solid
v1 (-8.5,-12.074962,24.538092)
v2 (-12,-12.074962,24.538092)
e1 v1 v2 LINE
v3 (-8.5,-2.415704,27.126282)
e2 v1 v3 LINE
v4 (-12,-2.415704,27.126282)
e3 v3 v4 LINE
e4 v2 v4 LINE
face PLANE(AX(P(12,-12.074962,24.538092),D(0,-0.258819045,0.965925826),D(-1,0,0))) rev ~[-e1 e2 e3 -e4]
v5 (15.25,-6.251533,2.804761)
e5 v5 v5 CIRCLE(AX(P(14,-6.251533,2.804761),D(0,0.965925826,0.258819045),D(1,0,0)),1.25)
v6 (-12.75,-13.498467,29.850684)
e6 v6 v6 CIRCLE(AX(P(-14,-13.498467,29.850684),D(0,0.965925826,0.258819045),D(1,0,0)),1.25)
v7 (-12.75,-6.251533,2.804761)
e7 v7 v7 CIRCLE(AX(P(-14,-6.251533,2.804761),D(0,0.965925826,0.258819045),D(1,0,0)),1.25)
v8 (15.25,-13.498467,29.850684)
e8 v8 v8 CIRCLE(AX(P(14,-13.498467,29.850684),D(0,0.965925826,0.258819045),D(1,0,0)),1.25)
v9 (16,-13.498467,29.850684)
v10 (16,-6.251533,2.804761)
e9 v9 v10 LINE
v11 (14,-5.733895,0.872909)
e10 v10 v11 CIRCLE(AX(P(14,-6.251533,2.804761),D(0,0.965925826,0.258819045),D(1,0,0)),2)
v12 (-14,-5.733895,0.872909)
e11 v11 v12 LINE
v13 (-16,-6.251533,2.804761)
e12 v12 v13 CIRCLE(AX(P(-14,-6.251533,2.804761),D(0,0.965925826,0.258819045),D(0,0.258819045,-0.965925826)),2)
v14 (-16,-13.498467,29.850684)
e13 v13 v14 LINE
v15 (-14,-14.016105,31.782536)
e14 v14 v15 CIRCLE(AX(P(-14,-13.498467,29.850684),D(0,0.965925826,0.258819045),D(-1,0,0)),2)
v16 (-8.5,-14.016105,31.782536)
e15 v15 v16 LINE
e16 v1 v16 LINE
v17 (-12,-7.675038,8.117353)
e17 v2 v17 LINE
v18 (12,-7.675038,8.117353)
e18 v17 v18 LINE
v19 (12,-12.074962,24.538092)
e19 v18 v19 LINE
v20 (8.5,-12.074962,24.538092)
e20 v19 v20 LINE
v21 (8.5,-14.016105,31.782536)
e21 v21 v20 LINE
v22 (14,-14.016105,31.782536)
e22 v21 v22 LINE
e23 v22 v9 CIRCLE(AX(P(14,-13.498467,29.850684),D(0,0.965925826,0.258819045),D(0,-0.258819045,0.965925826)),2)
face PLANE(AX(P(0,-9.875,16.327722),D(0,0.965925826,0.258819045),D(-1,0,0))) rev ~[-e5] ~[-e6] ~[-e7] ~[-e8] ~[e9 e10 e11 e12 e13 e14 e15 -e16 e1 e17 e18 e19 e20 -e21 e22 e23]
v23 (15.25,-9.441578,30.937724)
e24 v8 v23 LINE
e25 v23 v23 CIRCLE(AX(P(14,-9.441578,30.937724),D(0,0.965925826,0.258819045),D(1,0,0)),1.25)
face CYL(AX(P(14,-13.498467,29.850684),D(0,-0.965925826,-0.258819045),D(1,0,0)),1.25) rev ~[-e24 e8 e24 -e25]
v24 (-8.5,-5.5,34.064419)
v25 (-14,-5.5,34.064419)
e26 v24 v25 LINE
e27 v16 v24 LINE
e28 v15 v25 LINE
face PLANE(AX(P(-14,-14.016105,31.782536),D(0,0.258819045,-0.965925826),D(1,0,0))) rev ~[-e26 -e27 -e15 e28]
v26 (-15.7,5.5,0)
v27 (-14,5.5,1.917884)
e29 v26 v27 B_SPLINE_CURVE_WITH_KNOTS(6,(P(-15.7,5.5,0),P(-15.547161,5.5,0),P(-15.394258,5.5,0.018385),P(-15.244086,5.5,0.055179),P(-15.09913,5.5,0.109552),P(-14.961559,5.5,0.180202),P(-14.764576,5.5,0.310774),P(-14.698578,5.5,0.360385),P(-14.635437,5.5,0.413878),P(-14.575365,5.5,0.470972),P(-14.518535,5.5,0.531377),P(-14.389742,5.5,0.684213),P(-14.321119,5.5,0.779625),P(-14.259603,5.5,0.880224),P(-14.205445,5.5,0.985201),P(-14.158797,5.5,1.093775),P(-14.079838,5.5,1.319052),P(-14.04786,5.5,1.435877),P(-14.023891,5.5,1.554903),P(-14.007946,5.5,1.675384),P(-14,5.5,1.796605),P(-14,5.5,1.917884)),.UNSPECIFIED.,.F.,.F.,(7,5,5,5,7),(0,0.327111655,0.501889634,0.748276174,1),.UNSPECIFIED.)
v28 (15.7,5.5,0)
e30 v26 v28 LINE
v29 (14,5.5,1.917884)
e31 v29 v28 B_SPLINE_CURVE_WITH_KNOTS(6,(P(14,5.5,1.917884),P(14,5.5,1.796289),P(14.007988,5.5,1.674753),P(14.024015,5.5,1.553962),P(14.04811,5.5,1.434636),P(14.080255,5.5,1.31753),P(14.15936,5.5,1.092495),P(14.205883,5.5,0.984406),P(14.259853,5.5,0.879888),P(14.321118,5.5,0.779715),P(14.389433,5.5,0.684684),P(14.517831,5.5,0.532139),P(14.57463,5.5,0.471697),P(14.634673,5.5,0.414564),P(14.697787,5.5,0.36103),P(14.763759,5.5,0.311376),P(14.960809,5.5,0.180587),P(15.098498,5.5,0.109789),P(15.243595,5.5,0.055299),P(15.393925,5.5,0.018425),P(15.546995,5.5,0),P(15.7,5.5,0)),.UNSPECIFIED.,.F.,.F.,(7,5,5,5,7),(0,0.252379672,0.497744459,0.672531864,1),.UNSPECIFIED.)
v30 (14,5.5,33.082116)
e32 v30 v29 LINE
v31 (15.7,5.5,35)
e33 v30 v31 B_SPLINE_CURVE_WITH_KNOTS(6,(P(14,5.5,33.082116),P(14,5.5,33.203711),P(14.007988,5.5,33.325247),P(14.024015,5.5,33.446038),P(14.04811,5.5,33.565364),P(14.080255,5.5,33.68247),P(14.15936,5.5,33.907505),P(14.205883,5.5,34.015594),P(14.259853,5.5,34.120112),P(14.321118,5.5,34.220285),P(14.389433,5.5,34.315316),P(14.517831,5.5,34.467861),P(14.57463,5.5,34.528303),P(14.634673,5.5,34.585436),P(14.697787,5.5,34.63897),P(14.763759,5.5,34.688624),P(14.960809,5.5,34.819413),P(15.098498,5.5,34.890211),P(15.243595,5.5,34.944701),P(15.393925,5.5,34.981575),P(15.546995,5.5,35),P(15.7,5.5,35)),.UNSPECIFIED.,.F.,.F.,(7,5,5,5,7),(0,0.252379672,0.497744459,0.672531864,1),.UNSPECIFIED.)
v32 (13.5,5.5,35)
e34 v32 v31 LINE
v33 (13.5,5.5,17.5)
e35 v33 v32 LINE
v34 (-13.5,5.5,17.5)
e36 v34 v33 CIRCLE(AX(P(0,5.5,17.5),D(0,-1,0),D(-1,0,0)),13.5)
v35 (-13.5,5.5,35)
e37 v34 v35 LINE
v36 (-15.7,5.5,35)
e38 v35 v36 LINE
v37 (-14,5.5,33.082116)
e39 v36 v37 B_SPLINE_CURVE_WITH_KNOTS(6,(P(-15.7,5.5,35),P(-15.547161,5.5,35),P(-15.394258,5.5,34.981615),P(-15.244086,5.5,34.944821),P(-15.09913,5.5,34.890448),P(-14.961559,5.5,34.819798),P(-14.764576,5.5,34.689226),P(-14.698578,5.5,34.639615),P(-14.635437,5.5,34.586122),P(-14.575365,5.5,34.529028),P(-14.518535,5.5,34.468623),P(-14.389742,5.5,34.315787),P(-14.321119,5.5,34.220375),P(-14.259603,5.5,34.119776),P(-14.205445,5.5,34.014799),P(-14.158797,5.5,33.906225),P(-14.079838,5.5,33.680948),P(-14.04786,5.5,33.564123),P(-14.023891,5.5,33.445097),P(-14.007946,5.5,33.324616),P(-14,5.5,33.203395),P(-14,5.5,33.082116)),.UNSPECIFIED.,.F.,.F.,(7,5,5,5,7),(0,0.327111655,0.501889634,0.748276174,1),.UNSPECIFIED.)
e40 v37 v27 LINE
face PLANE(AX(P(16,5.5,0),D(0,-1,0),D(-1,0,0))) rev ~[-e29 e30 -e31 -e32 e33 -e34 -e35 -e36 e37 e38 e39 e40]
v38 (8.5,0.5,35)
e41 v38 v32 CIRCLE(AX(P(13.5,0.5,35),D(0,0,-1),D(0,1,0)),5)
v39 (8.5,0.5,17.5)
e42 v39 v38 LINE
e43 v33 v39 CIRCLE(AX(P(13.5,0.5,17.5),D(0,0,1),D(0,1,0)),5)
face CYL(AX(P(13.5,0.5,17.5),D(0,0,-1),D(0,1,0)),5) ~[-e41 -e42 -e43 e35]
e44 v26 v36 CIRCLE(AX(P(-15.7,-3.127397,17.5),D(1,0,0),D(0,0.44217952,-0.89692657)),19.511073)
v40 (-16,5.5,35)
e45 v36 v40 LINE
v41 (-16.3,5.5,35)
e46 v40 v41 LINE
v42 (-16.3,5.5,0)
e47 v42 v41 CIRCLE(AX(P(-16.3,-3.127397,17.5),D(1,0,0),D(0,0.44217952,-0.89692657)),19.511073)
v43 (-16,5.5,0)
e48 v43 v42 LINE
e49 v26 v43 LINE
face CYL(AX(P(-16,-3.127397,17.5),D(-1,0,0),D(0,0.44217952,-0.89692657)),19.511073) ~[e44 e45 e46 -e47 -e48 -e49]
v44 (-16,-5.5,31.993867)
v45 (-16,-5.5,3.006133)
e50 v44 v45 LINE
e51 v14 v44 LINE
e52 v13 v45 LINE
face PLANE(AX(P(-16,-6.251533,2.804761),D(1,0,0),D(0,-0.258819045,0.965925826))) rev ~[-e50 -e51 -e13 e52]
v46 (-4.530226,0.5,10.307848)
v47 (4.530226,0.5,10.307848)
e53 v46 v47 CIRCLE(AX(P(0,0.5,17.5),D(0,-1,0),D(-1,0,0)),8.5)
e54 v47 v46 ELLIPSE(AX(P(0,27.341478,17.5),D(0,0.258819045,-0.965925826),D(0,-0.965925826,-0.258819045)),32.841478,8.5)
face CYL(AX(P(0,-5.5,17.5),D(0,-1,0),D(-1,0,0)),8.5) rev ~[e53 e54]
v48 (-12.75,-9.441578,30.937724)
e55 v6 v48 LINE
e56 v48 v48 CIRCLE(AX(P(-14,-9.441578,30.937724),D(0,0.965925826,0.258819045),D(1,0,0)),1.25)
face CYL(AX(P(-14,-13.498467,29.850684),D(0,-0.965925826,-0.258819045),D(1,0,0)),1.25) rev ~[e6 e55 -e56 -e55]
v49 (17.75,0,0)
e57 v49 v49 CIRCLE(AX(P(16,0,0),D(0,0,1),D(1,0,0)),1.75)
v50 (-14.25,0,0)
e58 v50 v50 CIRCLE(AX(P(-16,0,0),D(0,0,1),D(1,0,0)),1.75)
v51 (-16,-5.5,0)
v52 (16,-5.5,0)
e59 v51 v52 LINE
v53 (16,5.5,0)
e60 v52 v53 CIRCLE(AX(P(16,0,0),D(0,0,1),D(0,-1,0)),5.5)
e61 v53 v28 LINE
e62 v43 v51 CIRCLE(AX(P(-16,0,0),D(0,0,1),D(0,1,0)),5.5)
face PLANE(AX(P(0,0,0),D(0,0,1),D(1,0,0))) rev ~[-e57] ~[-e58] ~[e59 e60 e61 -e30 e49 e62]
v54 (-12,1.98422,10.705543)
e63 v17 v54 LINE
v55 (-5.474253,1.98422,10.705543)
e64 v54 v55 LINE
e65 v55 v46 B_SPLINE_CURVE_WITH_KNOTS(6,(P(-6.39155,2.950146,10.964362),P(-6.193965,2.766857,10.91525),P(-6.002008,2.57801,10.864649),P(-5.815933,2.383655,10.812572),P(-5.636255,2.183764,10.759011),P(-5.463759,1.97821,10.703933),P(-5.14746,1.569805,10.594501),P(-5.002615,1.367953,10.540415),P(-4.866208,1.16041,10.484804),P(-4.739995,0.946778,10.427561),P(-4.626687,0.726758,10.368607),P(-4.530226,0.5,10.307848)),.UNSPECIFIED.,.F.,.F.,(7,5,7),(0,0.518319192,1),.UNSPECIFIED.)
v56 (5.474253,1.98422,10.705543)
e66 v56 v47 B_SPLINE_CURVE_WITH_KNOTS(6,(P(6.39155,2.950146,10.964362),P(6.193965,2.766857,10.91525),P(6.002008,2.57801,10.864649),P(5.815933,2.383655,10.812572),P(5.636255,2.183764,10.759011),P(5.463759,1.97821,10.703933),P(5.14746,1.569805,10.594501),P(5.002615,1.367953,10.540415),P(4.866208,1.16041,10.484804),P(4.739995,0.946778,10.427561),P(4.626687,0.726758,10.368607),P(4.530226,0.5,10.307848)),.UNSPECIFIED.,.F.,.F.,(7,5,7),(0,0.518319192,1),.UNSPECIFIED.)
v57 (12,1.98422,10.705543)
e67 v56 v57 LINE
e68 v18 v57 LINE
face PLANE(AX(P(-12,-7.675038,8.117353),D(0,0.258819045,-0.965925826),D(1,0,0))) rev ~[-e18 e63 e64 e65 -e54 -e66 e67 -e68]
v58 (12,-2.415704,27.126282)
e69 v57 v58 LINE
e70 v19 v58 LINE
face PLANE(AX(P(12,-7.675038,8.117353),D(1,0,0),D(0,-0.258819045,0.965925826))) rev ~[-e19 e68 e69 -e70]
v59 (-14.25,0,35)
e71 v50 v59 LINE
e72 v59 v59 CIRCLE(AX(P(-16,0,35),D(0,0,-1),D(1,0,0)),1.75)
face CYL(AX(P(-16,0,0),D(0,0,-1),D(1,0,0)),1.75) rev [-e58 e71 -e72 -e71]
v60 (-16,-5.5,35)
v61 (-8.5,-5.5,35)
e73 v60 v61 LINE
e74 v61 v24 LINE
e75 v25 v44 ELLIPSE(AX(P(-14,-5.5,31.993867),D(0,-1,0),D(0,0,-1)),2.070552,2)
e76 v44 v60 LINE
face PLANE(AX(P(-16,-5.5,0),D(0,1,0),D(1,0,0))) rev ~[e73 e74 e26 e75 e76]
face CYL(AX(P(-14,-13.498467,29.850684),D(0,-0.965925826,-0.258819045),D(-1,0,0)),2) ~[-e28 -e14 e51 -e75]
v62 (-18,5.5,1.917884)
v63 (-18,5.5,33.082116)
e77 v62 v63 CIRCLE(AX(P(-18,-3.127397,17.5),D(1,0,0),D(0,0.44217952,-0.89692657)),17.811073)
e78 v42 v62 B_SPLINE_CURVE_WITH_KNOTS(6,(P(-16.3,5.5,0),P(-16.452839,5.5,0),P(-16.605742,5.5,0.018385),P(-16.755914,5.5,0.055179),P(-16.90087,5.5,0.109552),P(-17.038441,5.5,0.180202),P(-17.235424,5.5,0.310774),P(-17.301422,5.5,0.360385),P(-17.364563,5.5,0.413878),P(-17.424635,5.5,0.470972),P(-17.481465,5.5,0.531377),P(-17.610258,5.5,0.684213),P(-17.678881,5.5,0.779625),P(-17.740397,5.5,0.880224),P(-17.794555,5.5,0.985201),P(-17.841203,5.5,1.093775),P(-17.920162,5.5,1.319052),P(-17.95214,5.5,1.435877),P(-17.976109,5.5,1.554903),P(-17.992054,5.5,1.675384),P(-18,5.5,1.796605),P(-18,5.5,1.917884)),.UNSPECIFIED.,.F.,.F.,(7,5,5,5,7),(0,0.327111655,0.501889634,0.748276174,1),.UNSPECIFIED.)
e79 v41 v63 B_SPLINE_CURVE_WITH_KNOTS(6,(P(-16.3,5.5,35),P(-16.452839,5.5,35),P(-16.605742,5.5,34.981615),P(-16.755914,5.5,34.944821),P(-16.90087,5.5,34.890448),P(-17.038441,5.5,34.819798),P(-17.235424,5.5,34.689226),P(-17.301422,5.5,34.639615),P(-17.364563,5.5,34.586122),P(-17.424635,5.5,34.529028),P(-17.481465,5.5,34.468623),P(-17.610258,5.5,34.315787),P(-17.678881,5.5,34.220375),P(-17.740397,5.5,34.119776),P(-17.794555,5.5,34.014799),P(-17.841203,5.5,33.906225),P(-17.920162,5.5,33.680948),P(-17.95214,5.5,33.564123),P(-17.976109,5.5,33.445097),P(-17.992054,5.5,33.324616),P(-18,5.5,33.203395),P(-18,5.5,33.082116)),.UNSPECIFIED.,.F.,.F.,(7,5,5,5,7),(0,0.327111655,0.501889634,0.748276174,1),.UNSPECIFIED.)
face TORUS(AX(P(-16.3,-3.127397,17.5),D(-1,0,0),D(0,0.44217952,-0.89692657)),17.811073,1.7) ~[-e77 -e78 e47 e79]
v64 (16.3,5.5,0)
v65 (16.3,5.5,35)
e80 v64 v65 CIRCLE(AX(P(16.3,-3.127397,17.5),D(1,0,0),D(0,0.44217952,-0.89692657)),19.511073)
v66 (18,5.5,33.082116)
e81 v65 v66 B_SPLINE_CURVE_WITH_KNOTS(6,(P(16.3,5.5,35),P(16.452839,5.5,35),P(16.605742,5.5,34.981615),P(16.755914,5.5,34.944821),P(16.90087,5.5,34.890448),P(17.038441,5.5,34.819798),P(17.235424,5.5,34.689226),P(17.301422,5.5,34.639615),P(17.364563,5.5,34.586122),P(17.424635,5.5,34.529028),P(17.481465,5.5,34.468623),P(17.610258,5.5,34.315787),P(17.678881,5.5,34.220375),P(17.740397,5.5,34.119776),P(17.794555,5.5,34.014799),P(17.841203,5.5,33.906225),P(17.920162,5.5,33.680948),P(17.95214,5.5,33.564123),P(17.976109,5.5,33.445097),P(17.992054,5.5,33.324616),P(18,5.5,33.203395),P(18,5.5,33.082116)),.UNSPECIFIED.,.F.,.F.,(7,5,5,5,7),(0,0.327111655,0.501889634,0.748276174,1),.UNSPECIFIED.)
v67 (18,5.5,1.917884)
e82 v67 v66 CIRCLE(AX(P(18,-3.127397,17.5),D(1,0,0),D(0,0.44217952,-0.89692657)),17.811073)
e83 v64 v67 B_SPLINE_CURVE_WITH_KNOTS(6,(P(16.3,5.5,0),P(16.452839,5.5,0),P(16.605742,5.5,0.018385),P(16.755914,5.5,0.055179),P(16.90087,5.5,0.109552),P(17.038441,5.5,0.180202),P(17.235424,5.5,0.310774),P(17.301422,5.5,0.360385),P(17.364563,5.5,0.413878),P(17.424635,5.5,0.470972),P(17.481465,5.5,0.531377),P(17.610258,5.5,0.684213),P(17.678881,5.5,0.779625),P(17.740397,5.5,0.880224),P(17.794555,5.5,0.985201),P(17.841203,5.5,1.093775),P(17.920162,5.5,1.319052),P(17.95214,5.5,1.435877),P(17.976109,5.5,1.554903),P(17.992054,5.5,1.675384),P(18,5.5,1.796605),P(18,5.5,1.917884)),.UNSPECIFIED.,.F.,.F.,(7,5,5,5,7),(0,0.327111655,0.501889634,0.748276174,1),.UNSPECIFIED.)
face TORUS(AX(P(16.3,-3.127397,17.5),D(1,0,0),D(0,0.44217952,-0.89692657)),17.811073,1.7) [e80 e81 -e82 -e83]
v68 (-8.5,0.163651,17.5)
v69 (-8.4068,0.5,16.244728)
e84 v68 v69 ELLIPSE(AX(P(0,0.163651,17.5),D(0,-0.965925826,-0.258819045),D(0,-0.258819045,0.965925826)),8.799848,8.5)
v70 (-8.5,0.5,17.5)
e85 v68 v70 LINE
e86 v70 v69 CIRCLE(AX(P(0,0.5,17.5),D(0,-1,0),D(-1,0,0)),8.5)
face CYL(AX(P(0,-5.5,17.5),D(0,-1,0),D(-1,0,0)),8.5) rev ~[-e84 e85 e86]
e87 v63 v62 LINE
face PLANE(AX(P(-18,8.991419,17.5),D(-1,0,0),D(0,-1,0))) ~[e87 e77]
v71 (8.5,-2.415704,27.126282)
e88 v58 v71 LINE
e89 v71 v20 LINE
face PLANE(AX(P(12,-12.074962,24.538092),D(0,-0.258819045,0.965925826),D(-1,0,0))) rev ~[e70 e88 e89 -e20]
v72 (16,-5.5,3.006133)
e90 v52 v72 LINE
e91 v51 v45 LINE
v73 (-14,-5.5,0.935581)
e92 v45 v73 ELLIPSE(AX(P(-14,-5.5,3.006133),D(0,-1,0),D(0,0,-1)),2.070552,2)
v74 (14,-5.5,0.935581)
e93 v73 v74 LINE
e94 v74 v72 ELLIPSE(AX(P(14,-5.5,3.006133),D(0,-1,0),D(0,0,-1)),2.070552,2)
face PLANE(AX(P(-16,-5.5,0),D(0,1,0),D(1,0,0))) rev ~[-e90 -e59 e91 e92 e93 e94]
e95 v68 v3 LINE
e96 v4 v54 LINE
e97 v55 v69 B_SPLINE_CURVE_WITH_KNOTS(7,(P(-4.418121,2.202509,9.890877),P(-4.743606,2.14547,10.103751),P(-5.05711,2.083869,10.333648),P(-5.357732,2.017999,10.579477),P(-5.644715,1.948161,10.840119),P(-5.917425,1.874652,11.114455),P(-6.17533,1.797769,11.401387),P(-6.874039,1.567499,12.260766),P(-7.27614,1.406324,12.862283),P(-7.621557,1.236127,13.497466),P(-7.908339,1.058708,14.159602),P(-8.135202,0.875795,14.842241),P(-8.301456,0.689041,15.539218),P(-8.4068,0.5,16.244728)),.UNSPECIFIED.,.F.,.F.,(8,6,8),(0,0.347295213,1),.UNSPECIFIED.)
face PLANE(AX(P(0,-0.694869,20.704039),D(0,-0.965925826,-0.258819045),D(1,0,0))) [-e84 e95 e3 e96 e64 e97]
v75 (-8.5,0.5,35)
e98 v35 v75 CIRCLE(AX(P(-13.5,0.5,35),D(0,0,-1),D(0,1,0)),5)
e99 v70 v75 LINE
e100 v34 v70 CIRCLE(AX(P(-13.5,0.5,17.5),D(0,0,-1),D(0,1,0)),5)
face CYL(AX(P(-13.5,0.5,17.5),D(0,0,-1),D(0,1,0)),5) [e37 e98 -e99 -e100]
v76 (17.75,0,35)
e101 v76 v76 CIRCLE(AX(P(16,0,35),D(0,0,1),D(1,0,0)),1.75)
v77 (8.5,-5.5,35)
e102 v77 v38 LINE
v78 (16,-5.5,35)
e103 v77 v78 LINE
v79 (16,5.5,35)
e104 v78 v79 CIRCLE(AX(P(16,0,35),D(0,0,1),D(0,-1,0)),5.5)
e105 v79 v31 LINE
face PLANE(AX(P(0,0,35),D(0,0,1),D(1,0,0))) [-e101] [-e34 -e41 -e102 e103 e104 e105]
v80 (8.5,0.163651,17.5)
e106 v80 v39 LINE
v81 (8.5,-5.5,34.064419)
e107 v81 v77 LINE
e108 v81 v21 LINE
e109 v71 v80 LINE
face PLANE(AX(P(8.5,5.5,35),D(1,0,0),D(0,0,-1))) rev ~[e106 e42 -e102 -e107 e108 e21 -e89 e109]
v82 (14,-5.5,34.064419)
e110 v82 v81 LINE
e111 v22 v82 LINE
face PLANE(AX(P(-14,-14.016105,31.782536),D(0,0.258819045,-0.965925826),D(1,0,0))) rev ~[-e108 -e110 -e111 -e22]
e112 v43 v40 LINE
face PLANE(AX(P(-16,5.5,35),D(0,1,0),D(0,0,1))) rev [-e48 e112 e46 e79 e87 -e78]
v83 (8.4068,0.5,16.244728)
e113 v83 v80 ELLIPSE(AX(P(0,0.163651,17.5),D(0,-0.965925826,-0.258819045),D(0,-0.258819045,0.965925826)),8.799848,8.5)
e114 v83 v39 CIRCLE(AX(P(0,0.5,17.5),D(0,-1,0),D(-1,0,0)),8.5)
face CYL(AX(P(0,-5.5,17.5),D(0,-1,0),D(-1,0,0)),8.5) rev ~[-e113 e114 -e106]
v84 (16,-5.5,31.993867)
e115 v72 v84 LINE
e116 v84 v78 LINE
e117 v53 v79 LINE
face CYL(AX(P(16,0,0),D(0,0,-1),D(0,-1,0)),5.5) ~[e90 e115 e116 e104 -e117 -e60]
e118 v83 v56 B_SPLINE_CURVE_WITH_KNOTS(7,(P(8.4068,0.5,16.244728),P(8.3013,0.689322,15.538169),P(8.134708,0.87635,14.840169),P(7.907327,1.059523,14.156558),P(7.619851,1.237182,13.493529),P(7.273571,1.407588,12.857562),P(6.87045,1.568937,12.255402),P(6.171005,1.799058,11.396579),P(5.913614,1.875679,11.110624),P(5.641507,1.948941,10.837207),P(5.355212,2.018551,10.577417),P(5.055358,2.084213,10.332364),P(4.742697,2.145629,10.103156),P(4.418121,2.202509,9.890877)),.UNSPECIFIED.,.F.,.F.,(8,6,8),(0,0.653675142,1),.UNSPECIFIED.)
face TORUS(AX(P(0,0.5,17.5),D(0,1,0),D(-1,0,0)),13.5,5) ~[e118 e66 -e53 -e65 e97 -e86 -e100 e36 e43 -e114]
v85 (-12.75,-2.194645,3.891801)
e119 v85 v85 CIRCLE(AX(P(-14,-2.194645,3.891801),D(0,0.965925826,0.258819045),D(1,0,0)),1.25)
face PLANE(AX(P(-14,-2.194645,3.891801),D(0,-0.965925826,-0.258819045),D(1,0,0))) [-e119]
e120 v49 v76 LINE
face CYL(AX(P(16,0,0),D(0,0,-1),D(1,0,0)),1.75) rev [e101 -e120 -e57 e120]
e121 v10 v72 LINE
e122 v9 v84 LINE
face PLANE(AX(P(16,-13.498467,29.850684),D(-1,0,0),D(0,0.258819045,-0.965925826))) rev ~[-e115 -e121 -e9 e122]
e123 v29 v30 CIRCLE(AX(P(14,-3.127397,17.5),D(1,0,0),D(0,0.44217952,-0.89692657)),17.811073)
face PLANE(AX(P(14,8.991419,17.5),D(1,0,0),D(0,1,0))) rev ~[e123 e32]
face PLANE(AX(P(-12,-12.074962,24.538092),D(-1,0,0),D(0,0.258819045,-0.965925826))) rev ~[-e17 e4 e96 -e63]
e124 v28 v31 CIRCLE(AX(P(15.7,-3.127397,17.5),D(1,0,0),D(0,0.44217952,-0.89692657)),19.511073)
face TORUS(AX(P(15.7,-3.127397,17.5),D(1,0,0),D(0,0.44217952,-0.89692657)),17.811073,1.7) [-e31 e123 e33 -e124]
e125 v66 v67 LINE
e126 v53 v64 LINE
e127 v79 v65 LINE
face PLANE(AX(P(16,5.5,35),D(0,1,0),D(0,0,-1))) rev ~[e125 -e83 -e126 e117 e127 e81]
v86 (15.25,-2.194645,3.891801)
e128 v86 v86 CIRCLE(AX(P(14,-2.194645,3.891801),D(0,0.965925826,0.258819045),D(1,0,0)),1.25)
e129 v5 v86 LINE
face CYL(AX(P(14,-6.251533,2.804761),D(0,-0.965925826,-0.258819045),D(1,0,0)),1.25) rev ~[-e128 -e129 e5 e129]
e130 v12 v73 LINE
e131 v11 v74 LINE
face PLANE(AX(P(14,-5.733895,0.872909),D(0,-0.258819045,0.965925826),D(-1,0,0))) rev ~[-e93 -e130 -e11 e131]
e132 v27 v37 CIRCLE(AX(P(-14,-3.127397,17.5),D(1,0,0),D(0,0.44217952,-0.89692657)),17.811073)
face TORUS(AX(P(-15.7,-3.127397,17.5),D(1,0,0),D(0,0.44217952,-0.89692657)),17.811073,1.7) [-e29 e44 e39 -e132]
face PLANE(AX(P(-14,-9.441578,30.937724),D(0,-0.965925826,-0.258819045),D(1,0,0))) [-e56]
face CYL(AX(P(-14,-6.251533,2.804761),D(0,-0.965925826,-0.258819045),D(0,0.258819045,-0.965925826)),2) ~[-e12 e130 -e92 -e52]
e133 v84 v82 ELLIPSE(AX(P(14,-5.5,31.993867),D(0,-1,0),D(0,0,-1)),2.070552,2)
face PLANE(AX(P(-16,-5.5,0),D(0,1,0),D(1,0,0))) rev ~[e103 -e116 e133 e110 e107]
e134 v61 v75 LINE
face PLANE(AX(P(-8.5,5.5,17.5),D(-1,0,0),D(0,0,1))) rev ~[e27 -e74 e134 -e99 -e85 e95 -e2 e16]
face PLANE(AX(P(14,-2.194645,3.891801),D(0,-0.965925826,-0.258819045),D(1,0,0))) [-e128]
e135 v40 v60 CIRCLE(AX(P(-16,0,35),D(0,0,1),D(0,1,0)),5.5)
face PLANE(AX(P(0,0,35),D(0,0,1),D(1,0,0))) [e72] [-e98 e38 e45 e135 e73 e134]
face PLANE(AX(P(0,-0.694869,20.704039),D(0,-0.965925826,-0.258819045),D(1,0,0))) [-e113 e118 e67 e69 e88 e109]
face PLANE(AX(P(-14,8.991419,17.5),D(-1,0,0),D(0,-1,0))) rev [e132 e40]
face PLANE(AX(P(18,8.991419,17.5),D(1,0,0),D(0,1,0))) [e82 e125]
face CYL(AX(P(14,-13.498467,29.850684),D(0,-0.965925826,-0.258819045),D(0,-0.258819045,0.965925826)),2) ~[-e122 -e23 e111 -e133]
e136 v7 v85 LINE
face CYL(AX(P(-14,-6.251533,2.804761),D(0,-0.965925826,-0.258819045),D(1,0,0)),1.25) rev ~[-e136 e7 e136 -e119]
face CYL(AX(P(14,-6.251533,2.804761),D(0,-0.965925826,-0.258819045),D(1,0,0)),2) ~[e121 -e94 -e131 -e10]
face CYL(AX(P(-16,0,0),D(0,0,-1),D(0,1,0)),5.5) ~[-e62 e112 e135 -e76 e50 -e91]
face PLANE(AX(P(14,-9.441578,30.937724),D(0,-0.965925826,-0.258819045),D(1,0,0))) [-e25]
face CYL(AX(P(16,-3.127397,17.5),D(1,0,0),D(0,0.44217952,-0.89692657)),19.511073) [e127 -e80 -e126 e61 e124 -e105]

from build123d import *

# Parameters (mm, degrees)
F0_R           = 1.75
F1_DEPTH       = 35
F3_DEPTH       = 11.001
F6_REACH       = 64.9396846637
F8_DEPTH       = 25
F9_R           = 1.25
F10_DEPTH      = 4.2
F12_DEPTH      = 10
F14_DEPTH      = 2
F14_DEPTH_BACK = 2
F16_R          = 1.7
F17_T1_DEPTH   = 30
F17_T4_ANGLE   = 180


# Not quite as in the source:
# - a fillet or chamfer that OpenCascade refuses, or shapes differently, is made with other operations: its cross-section is extruded or revolved along the edge and cut away or added
# - a feature of the source that left no trace in its solid (it failed there, or was rolled back) is left out


with BuildPart() as f1:
    # F0 (on Top) → F1 (new body)
    with BuildSketch(Plane.XY):
        with BuildLine():
            Line((16, 5.5), (-16, 5.5))
            ThreePointArc((-16, 5.5), (-21.5, 0), (-16, -5.5))
            Line((-16, -5.5), (16, -5.5))
            ThreePointArc((16, -5.5), (21.5, 0), (16, 5.5))
        make_face()
        with Locations((-16, 0)):
            Circle(F0_R, mode=Mode.SUBTRACT)
        with Locations((16, 0)):
            Circle(F0_R, mode=Mode.SUBTRACT)
    extrude(amount=F1_DEPTH)

    # F2 (on face) → F3 (cut, through all)
    with BuildSketch(Plane.XZ.offset(5.5)):
        with BuildLine():
            Line((-8.5, 35), (-8.5, 17.5))
            ThreePointArc((-8.5, 17.5), (0, 9), (8.5, 17.5))
            Line((8.5, 17.5), (8.5, 35))
            Line((8.5, 35), (-8.5, 35))
        make_face()
    extrude(amount=-F3_DEPTH, mode=Mode.SUBTRACT)

    f6_end = Plane(origin=(0, -5.5, 14.4059555713), x_dir=(0, 0, -1), z_dir=(0, -1, 0))
    # F5 (on face) → F6 (join, up to a plane its end follows)
    with BuildSketch(Plane(origin=(0, -5.1315698604, -1.375), x_dir=(-1, 0, 0), z_dir=(0, 0.9659258263, 0.2588190451))):
        with BuildLine():
            ThreePointArc((16, 32.3272067081), (15.4142135624, 33.7414202705), (14, 34.3272067081))
            Line((14, 34.3272067081), (-14, 34.3272067081))
            ThreePointArc((-14, 34.3272067081), (-15.4142135624, 33.7414202705), (-16, 32.3272067081))
            Line((-16, 32.3272067081), (-16, 4.3272067081))
            ThreePointArc((-16, 4.3272067081), (-15.4142135624, 2.9129931457), (-14, 2.3272067081))
            Line((-14, 2.3272067081), (14, 2.3272067081))
            ThreePointArc((14, 2.3272067081), (15.4142135624, 2.9129931457), (16, 4.3272067081))
            Line((16, 4.3272067081), (16, 32.3272067081))
        make_face()
    f6_long = extrude(amount=F6_REACH, mode=Mode.PRIVATE)
    add(split(f6_long, bisect_by=f6_end, keep=Keep.TOP, mode=Mode.PRIVATE))

    # F7 (on face) → F8 (cut)
    with BuildSketch(Plane(origin=(0, 5.5, 0), x_dir=(-1, 0, 0), z_dir=(0, 1, 0))):
        with BuildLine():
            Line((8.5, 35), (-8.5, 35))
            Line((-8.5, 35), (-8.5, 17.5))
            ThreePointArc((-8.5, 17.5), (0, 9), (8.5, 17.5))
            Line((8.5, 17.5), (8.5, 35))
        make_face()
    extrude(amount=-F8_DEPTH, mode=Mode.SUBTRACT)

    # F9 (on face) → F10 (cut)
    with BuildSketch(Plane(origin=(0, -5.1315698604, -1.375), x_dir=(1, 0, 0), z_dir=(0, -0.9659258263, -0.2588190451))):
        with Locations((-14, 32.3272067081)):
            Circle(F9_R)
        with Locations((14, 32.3272067081)):
            Circle(F9_R)
        with Locations((14, 4.3272067081)):
            Circle(F9_R)
        with Locations((-14, 4.3272067081)):
            Circle(F9_R)
    extrude(amount=-F10_DEPTH, mode=Mode.SUBTRACT)

    # F11 (on face) → F12 (cut)
    with BuildSketch(Plane(origin=(0, -5.1315698604, -1.375), x_dir=(1, 0, 0), z_dir=(0, -0.9659258263, -0.2588190451))):
        with BuildLine():
            Line((8.5, 19.5408379052), (8.5, 26.8272067081))
            Line((8.5, 26.8272067081), (-8.5, 26.8272067081))
            Line((-8.5, 26.8272067081), (-8.5, 19.5408379052))
            add(Edge.make_bspline(
                [(8.5, 19.5408379052), (8.5, 10.7409903718), (0, 10.7409903718), (-8.5, 10.7409903718), (-8.5, 19.5408379052)],
                knots=[4.7123889804, 4.7123889804, 4.7123889804, 6.2831853072, 6.2831853072, 7.853981634, 7.853981634, 7.853981634], degree=2, weights=[1, 0.7071067812, 1, 0.7071067812, 1]))
        make_face()
        with BuildLine():
            Line((12, 9.8272067081), (12, 26.8272067081))
            Line((12, 26.8272067081), (8.5, 26.8272067081))
            Line((8.5, 26.8272067081), (8.5, 19.5408379052))
            add(Edge.make_bspline(
                [(8.5, 19.5408379052), (8.5, 10.7409903718), (0, 10.7409903718), (-8.5, 10.7409903718), (-8.5, 19.5408379052)],
                knots=[4.7123889804, 4.7123889804, 4.7123889804, 6.2831853072, 6.2831853072, 7.853981634, 7.853981634, 7.853981634], degree=2, weights=[1, 0.7071067812, 1, 0.7071067812, 1]))
            Line((-8.5, 19.5408379052), (-8.5, 26.8272067081))
            Line((-8.5, 26.8272067081), (-12, 26.8272067081))
            Line((-12, 26.8272067081), (-12, 9.8272067081))
            Line((-12, 9.8272067081), (12, 9.8272067081))
        make_face()
    extrude(amount=-F12_DEPTH, mode=Mode.SUBTRACT)

    # F13 (on face) → F14 (join, two sides)
    with BuildSketch(Plane.YZ.offset(16)) as f14_sk:
        with BuildLine():
            ThreePointArc((5.5, 0), (16.3836762358, 17.5), (5.5, 35))
            Line((5.5, 35), (5.5, 0))
        make_face()
    extrude(amount=F14_DEPTH)
    extrude(f14_sk.sketch, amount=-F14_DEPTH_BACK)

    # F15: F1 across plane


with BuildPart() as f1_1:
    add(f1.part)
    add(f1.part.mirror(Plane.YZ))

    # F16
    f16_edges = [f1_1.edges().sort_by_distance(p)[0] for p in [
        (18, 16.383676, 17.5),
        (14, 16.383676, 17.5),
        (-14, 16.383676, 17.5),
        (-18, 16.383676, 17.5),
    ]]
    fillet(f16_edges, radius=F16_R)

    # F17: fillet of radius 5 on 3 edges, made by hand

    # F17_s2 → F17_t1 (cut)
    with BuildSketch(Plane.XY.offset(17.5)):
        with BuildLine():
            ThreePointArc((13.5, 5.5), (9.9644660941, 4.0355339059), (8.5, 0.5))
            Line((8.5, 0.5), (8.5, 5.5))
            Line((8.5, 5.5), (13.5, 5.5))
        make_face()
        with BuildLine():
            ThreePointArc((-13.5, 5.5), (-9.9644660941, 4.0355339059), (-8.5, 0.5))
            Line((-8.5, 0.5), (-8.5, 5.5))
            Line((-8.5, 5.5), (-13.5, 5.5))
        make_face()
    extrude(amount=F17_T1_DEPTH, mode=Mode.SUBTRACT)

    # F17_s3 → F17_t4 (revolve, cut)
    with BuildSketch(Plane.XY.offset(17.5)):
        with BuildLine():
            ThreePointArc((-13.5, 5.5), (-9.9644660941, 4.0355339059), (-8.5, 0.5))
            Line((-8.5, 0.5), (-8.5, 5.5))
            Line((-8.5, 5.5), (-13.5, 5.5))
        make_face()
    revolve(axis=Axis((0, 5.5, 17.5), (0, -1, 0)), revolution_arc=F17_T4_ANGLE, mode=Mode.SUBTRACT)


solid = f1_1.part
